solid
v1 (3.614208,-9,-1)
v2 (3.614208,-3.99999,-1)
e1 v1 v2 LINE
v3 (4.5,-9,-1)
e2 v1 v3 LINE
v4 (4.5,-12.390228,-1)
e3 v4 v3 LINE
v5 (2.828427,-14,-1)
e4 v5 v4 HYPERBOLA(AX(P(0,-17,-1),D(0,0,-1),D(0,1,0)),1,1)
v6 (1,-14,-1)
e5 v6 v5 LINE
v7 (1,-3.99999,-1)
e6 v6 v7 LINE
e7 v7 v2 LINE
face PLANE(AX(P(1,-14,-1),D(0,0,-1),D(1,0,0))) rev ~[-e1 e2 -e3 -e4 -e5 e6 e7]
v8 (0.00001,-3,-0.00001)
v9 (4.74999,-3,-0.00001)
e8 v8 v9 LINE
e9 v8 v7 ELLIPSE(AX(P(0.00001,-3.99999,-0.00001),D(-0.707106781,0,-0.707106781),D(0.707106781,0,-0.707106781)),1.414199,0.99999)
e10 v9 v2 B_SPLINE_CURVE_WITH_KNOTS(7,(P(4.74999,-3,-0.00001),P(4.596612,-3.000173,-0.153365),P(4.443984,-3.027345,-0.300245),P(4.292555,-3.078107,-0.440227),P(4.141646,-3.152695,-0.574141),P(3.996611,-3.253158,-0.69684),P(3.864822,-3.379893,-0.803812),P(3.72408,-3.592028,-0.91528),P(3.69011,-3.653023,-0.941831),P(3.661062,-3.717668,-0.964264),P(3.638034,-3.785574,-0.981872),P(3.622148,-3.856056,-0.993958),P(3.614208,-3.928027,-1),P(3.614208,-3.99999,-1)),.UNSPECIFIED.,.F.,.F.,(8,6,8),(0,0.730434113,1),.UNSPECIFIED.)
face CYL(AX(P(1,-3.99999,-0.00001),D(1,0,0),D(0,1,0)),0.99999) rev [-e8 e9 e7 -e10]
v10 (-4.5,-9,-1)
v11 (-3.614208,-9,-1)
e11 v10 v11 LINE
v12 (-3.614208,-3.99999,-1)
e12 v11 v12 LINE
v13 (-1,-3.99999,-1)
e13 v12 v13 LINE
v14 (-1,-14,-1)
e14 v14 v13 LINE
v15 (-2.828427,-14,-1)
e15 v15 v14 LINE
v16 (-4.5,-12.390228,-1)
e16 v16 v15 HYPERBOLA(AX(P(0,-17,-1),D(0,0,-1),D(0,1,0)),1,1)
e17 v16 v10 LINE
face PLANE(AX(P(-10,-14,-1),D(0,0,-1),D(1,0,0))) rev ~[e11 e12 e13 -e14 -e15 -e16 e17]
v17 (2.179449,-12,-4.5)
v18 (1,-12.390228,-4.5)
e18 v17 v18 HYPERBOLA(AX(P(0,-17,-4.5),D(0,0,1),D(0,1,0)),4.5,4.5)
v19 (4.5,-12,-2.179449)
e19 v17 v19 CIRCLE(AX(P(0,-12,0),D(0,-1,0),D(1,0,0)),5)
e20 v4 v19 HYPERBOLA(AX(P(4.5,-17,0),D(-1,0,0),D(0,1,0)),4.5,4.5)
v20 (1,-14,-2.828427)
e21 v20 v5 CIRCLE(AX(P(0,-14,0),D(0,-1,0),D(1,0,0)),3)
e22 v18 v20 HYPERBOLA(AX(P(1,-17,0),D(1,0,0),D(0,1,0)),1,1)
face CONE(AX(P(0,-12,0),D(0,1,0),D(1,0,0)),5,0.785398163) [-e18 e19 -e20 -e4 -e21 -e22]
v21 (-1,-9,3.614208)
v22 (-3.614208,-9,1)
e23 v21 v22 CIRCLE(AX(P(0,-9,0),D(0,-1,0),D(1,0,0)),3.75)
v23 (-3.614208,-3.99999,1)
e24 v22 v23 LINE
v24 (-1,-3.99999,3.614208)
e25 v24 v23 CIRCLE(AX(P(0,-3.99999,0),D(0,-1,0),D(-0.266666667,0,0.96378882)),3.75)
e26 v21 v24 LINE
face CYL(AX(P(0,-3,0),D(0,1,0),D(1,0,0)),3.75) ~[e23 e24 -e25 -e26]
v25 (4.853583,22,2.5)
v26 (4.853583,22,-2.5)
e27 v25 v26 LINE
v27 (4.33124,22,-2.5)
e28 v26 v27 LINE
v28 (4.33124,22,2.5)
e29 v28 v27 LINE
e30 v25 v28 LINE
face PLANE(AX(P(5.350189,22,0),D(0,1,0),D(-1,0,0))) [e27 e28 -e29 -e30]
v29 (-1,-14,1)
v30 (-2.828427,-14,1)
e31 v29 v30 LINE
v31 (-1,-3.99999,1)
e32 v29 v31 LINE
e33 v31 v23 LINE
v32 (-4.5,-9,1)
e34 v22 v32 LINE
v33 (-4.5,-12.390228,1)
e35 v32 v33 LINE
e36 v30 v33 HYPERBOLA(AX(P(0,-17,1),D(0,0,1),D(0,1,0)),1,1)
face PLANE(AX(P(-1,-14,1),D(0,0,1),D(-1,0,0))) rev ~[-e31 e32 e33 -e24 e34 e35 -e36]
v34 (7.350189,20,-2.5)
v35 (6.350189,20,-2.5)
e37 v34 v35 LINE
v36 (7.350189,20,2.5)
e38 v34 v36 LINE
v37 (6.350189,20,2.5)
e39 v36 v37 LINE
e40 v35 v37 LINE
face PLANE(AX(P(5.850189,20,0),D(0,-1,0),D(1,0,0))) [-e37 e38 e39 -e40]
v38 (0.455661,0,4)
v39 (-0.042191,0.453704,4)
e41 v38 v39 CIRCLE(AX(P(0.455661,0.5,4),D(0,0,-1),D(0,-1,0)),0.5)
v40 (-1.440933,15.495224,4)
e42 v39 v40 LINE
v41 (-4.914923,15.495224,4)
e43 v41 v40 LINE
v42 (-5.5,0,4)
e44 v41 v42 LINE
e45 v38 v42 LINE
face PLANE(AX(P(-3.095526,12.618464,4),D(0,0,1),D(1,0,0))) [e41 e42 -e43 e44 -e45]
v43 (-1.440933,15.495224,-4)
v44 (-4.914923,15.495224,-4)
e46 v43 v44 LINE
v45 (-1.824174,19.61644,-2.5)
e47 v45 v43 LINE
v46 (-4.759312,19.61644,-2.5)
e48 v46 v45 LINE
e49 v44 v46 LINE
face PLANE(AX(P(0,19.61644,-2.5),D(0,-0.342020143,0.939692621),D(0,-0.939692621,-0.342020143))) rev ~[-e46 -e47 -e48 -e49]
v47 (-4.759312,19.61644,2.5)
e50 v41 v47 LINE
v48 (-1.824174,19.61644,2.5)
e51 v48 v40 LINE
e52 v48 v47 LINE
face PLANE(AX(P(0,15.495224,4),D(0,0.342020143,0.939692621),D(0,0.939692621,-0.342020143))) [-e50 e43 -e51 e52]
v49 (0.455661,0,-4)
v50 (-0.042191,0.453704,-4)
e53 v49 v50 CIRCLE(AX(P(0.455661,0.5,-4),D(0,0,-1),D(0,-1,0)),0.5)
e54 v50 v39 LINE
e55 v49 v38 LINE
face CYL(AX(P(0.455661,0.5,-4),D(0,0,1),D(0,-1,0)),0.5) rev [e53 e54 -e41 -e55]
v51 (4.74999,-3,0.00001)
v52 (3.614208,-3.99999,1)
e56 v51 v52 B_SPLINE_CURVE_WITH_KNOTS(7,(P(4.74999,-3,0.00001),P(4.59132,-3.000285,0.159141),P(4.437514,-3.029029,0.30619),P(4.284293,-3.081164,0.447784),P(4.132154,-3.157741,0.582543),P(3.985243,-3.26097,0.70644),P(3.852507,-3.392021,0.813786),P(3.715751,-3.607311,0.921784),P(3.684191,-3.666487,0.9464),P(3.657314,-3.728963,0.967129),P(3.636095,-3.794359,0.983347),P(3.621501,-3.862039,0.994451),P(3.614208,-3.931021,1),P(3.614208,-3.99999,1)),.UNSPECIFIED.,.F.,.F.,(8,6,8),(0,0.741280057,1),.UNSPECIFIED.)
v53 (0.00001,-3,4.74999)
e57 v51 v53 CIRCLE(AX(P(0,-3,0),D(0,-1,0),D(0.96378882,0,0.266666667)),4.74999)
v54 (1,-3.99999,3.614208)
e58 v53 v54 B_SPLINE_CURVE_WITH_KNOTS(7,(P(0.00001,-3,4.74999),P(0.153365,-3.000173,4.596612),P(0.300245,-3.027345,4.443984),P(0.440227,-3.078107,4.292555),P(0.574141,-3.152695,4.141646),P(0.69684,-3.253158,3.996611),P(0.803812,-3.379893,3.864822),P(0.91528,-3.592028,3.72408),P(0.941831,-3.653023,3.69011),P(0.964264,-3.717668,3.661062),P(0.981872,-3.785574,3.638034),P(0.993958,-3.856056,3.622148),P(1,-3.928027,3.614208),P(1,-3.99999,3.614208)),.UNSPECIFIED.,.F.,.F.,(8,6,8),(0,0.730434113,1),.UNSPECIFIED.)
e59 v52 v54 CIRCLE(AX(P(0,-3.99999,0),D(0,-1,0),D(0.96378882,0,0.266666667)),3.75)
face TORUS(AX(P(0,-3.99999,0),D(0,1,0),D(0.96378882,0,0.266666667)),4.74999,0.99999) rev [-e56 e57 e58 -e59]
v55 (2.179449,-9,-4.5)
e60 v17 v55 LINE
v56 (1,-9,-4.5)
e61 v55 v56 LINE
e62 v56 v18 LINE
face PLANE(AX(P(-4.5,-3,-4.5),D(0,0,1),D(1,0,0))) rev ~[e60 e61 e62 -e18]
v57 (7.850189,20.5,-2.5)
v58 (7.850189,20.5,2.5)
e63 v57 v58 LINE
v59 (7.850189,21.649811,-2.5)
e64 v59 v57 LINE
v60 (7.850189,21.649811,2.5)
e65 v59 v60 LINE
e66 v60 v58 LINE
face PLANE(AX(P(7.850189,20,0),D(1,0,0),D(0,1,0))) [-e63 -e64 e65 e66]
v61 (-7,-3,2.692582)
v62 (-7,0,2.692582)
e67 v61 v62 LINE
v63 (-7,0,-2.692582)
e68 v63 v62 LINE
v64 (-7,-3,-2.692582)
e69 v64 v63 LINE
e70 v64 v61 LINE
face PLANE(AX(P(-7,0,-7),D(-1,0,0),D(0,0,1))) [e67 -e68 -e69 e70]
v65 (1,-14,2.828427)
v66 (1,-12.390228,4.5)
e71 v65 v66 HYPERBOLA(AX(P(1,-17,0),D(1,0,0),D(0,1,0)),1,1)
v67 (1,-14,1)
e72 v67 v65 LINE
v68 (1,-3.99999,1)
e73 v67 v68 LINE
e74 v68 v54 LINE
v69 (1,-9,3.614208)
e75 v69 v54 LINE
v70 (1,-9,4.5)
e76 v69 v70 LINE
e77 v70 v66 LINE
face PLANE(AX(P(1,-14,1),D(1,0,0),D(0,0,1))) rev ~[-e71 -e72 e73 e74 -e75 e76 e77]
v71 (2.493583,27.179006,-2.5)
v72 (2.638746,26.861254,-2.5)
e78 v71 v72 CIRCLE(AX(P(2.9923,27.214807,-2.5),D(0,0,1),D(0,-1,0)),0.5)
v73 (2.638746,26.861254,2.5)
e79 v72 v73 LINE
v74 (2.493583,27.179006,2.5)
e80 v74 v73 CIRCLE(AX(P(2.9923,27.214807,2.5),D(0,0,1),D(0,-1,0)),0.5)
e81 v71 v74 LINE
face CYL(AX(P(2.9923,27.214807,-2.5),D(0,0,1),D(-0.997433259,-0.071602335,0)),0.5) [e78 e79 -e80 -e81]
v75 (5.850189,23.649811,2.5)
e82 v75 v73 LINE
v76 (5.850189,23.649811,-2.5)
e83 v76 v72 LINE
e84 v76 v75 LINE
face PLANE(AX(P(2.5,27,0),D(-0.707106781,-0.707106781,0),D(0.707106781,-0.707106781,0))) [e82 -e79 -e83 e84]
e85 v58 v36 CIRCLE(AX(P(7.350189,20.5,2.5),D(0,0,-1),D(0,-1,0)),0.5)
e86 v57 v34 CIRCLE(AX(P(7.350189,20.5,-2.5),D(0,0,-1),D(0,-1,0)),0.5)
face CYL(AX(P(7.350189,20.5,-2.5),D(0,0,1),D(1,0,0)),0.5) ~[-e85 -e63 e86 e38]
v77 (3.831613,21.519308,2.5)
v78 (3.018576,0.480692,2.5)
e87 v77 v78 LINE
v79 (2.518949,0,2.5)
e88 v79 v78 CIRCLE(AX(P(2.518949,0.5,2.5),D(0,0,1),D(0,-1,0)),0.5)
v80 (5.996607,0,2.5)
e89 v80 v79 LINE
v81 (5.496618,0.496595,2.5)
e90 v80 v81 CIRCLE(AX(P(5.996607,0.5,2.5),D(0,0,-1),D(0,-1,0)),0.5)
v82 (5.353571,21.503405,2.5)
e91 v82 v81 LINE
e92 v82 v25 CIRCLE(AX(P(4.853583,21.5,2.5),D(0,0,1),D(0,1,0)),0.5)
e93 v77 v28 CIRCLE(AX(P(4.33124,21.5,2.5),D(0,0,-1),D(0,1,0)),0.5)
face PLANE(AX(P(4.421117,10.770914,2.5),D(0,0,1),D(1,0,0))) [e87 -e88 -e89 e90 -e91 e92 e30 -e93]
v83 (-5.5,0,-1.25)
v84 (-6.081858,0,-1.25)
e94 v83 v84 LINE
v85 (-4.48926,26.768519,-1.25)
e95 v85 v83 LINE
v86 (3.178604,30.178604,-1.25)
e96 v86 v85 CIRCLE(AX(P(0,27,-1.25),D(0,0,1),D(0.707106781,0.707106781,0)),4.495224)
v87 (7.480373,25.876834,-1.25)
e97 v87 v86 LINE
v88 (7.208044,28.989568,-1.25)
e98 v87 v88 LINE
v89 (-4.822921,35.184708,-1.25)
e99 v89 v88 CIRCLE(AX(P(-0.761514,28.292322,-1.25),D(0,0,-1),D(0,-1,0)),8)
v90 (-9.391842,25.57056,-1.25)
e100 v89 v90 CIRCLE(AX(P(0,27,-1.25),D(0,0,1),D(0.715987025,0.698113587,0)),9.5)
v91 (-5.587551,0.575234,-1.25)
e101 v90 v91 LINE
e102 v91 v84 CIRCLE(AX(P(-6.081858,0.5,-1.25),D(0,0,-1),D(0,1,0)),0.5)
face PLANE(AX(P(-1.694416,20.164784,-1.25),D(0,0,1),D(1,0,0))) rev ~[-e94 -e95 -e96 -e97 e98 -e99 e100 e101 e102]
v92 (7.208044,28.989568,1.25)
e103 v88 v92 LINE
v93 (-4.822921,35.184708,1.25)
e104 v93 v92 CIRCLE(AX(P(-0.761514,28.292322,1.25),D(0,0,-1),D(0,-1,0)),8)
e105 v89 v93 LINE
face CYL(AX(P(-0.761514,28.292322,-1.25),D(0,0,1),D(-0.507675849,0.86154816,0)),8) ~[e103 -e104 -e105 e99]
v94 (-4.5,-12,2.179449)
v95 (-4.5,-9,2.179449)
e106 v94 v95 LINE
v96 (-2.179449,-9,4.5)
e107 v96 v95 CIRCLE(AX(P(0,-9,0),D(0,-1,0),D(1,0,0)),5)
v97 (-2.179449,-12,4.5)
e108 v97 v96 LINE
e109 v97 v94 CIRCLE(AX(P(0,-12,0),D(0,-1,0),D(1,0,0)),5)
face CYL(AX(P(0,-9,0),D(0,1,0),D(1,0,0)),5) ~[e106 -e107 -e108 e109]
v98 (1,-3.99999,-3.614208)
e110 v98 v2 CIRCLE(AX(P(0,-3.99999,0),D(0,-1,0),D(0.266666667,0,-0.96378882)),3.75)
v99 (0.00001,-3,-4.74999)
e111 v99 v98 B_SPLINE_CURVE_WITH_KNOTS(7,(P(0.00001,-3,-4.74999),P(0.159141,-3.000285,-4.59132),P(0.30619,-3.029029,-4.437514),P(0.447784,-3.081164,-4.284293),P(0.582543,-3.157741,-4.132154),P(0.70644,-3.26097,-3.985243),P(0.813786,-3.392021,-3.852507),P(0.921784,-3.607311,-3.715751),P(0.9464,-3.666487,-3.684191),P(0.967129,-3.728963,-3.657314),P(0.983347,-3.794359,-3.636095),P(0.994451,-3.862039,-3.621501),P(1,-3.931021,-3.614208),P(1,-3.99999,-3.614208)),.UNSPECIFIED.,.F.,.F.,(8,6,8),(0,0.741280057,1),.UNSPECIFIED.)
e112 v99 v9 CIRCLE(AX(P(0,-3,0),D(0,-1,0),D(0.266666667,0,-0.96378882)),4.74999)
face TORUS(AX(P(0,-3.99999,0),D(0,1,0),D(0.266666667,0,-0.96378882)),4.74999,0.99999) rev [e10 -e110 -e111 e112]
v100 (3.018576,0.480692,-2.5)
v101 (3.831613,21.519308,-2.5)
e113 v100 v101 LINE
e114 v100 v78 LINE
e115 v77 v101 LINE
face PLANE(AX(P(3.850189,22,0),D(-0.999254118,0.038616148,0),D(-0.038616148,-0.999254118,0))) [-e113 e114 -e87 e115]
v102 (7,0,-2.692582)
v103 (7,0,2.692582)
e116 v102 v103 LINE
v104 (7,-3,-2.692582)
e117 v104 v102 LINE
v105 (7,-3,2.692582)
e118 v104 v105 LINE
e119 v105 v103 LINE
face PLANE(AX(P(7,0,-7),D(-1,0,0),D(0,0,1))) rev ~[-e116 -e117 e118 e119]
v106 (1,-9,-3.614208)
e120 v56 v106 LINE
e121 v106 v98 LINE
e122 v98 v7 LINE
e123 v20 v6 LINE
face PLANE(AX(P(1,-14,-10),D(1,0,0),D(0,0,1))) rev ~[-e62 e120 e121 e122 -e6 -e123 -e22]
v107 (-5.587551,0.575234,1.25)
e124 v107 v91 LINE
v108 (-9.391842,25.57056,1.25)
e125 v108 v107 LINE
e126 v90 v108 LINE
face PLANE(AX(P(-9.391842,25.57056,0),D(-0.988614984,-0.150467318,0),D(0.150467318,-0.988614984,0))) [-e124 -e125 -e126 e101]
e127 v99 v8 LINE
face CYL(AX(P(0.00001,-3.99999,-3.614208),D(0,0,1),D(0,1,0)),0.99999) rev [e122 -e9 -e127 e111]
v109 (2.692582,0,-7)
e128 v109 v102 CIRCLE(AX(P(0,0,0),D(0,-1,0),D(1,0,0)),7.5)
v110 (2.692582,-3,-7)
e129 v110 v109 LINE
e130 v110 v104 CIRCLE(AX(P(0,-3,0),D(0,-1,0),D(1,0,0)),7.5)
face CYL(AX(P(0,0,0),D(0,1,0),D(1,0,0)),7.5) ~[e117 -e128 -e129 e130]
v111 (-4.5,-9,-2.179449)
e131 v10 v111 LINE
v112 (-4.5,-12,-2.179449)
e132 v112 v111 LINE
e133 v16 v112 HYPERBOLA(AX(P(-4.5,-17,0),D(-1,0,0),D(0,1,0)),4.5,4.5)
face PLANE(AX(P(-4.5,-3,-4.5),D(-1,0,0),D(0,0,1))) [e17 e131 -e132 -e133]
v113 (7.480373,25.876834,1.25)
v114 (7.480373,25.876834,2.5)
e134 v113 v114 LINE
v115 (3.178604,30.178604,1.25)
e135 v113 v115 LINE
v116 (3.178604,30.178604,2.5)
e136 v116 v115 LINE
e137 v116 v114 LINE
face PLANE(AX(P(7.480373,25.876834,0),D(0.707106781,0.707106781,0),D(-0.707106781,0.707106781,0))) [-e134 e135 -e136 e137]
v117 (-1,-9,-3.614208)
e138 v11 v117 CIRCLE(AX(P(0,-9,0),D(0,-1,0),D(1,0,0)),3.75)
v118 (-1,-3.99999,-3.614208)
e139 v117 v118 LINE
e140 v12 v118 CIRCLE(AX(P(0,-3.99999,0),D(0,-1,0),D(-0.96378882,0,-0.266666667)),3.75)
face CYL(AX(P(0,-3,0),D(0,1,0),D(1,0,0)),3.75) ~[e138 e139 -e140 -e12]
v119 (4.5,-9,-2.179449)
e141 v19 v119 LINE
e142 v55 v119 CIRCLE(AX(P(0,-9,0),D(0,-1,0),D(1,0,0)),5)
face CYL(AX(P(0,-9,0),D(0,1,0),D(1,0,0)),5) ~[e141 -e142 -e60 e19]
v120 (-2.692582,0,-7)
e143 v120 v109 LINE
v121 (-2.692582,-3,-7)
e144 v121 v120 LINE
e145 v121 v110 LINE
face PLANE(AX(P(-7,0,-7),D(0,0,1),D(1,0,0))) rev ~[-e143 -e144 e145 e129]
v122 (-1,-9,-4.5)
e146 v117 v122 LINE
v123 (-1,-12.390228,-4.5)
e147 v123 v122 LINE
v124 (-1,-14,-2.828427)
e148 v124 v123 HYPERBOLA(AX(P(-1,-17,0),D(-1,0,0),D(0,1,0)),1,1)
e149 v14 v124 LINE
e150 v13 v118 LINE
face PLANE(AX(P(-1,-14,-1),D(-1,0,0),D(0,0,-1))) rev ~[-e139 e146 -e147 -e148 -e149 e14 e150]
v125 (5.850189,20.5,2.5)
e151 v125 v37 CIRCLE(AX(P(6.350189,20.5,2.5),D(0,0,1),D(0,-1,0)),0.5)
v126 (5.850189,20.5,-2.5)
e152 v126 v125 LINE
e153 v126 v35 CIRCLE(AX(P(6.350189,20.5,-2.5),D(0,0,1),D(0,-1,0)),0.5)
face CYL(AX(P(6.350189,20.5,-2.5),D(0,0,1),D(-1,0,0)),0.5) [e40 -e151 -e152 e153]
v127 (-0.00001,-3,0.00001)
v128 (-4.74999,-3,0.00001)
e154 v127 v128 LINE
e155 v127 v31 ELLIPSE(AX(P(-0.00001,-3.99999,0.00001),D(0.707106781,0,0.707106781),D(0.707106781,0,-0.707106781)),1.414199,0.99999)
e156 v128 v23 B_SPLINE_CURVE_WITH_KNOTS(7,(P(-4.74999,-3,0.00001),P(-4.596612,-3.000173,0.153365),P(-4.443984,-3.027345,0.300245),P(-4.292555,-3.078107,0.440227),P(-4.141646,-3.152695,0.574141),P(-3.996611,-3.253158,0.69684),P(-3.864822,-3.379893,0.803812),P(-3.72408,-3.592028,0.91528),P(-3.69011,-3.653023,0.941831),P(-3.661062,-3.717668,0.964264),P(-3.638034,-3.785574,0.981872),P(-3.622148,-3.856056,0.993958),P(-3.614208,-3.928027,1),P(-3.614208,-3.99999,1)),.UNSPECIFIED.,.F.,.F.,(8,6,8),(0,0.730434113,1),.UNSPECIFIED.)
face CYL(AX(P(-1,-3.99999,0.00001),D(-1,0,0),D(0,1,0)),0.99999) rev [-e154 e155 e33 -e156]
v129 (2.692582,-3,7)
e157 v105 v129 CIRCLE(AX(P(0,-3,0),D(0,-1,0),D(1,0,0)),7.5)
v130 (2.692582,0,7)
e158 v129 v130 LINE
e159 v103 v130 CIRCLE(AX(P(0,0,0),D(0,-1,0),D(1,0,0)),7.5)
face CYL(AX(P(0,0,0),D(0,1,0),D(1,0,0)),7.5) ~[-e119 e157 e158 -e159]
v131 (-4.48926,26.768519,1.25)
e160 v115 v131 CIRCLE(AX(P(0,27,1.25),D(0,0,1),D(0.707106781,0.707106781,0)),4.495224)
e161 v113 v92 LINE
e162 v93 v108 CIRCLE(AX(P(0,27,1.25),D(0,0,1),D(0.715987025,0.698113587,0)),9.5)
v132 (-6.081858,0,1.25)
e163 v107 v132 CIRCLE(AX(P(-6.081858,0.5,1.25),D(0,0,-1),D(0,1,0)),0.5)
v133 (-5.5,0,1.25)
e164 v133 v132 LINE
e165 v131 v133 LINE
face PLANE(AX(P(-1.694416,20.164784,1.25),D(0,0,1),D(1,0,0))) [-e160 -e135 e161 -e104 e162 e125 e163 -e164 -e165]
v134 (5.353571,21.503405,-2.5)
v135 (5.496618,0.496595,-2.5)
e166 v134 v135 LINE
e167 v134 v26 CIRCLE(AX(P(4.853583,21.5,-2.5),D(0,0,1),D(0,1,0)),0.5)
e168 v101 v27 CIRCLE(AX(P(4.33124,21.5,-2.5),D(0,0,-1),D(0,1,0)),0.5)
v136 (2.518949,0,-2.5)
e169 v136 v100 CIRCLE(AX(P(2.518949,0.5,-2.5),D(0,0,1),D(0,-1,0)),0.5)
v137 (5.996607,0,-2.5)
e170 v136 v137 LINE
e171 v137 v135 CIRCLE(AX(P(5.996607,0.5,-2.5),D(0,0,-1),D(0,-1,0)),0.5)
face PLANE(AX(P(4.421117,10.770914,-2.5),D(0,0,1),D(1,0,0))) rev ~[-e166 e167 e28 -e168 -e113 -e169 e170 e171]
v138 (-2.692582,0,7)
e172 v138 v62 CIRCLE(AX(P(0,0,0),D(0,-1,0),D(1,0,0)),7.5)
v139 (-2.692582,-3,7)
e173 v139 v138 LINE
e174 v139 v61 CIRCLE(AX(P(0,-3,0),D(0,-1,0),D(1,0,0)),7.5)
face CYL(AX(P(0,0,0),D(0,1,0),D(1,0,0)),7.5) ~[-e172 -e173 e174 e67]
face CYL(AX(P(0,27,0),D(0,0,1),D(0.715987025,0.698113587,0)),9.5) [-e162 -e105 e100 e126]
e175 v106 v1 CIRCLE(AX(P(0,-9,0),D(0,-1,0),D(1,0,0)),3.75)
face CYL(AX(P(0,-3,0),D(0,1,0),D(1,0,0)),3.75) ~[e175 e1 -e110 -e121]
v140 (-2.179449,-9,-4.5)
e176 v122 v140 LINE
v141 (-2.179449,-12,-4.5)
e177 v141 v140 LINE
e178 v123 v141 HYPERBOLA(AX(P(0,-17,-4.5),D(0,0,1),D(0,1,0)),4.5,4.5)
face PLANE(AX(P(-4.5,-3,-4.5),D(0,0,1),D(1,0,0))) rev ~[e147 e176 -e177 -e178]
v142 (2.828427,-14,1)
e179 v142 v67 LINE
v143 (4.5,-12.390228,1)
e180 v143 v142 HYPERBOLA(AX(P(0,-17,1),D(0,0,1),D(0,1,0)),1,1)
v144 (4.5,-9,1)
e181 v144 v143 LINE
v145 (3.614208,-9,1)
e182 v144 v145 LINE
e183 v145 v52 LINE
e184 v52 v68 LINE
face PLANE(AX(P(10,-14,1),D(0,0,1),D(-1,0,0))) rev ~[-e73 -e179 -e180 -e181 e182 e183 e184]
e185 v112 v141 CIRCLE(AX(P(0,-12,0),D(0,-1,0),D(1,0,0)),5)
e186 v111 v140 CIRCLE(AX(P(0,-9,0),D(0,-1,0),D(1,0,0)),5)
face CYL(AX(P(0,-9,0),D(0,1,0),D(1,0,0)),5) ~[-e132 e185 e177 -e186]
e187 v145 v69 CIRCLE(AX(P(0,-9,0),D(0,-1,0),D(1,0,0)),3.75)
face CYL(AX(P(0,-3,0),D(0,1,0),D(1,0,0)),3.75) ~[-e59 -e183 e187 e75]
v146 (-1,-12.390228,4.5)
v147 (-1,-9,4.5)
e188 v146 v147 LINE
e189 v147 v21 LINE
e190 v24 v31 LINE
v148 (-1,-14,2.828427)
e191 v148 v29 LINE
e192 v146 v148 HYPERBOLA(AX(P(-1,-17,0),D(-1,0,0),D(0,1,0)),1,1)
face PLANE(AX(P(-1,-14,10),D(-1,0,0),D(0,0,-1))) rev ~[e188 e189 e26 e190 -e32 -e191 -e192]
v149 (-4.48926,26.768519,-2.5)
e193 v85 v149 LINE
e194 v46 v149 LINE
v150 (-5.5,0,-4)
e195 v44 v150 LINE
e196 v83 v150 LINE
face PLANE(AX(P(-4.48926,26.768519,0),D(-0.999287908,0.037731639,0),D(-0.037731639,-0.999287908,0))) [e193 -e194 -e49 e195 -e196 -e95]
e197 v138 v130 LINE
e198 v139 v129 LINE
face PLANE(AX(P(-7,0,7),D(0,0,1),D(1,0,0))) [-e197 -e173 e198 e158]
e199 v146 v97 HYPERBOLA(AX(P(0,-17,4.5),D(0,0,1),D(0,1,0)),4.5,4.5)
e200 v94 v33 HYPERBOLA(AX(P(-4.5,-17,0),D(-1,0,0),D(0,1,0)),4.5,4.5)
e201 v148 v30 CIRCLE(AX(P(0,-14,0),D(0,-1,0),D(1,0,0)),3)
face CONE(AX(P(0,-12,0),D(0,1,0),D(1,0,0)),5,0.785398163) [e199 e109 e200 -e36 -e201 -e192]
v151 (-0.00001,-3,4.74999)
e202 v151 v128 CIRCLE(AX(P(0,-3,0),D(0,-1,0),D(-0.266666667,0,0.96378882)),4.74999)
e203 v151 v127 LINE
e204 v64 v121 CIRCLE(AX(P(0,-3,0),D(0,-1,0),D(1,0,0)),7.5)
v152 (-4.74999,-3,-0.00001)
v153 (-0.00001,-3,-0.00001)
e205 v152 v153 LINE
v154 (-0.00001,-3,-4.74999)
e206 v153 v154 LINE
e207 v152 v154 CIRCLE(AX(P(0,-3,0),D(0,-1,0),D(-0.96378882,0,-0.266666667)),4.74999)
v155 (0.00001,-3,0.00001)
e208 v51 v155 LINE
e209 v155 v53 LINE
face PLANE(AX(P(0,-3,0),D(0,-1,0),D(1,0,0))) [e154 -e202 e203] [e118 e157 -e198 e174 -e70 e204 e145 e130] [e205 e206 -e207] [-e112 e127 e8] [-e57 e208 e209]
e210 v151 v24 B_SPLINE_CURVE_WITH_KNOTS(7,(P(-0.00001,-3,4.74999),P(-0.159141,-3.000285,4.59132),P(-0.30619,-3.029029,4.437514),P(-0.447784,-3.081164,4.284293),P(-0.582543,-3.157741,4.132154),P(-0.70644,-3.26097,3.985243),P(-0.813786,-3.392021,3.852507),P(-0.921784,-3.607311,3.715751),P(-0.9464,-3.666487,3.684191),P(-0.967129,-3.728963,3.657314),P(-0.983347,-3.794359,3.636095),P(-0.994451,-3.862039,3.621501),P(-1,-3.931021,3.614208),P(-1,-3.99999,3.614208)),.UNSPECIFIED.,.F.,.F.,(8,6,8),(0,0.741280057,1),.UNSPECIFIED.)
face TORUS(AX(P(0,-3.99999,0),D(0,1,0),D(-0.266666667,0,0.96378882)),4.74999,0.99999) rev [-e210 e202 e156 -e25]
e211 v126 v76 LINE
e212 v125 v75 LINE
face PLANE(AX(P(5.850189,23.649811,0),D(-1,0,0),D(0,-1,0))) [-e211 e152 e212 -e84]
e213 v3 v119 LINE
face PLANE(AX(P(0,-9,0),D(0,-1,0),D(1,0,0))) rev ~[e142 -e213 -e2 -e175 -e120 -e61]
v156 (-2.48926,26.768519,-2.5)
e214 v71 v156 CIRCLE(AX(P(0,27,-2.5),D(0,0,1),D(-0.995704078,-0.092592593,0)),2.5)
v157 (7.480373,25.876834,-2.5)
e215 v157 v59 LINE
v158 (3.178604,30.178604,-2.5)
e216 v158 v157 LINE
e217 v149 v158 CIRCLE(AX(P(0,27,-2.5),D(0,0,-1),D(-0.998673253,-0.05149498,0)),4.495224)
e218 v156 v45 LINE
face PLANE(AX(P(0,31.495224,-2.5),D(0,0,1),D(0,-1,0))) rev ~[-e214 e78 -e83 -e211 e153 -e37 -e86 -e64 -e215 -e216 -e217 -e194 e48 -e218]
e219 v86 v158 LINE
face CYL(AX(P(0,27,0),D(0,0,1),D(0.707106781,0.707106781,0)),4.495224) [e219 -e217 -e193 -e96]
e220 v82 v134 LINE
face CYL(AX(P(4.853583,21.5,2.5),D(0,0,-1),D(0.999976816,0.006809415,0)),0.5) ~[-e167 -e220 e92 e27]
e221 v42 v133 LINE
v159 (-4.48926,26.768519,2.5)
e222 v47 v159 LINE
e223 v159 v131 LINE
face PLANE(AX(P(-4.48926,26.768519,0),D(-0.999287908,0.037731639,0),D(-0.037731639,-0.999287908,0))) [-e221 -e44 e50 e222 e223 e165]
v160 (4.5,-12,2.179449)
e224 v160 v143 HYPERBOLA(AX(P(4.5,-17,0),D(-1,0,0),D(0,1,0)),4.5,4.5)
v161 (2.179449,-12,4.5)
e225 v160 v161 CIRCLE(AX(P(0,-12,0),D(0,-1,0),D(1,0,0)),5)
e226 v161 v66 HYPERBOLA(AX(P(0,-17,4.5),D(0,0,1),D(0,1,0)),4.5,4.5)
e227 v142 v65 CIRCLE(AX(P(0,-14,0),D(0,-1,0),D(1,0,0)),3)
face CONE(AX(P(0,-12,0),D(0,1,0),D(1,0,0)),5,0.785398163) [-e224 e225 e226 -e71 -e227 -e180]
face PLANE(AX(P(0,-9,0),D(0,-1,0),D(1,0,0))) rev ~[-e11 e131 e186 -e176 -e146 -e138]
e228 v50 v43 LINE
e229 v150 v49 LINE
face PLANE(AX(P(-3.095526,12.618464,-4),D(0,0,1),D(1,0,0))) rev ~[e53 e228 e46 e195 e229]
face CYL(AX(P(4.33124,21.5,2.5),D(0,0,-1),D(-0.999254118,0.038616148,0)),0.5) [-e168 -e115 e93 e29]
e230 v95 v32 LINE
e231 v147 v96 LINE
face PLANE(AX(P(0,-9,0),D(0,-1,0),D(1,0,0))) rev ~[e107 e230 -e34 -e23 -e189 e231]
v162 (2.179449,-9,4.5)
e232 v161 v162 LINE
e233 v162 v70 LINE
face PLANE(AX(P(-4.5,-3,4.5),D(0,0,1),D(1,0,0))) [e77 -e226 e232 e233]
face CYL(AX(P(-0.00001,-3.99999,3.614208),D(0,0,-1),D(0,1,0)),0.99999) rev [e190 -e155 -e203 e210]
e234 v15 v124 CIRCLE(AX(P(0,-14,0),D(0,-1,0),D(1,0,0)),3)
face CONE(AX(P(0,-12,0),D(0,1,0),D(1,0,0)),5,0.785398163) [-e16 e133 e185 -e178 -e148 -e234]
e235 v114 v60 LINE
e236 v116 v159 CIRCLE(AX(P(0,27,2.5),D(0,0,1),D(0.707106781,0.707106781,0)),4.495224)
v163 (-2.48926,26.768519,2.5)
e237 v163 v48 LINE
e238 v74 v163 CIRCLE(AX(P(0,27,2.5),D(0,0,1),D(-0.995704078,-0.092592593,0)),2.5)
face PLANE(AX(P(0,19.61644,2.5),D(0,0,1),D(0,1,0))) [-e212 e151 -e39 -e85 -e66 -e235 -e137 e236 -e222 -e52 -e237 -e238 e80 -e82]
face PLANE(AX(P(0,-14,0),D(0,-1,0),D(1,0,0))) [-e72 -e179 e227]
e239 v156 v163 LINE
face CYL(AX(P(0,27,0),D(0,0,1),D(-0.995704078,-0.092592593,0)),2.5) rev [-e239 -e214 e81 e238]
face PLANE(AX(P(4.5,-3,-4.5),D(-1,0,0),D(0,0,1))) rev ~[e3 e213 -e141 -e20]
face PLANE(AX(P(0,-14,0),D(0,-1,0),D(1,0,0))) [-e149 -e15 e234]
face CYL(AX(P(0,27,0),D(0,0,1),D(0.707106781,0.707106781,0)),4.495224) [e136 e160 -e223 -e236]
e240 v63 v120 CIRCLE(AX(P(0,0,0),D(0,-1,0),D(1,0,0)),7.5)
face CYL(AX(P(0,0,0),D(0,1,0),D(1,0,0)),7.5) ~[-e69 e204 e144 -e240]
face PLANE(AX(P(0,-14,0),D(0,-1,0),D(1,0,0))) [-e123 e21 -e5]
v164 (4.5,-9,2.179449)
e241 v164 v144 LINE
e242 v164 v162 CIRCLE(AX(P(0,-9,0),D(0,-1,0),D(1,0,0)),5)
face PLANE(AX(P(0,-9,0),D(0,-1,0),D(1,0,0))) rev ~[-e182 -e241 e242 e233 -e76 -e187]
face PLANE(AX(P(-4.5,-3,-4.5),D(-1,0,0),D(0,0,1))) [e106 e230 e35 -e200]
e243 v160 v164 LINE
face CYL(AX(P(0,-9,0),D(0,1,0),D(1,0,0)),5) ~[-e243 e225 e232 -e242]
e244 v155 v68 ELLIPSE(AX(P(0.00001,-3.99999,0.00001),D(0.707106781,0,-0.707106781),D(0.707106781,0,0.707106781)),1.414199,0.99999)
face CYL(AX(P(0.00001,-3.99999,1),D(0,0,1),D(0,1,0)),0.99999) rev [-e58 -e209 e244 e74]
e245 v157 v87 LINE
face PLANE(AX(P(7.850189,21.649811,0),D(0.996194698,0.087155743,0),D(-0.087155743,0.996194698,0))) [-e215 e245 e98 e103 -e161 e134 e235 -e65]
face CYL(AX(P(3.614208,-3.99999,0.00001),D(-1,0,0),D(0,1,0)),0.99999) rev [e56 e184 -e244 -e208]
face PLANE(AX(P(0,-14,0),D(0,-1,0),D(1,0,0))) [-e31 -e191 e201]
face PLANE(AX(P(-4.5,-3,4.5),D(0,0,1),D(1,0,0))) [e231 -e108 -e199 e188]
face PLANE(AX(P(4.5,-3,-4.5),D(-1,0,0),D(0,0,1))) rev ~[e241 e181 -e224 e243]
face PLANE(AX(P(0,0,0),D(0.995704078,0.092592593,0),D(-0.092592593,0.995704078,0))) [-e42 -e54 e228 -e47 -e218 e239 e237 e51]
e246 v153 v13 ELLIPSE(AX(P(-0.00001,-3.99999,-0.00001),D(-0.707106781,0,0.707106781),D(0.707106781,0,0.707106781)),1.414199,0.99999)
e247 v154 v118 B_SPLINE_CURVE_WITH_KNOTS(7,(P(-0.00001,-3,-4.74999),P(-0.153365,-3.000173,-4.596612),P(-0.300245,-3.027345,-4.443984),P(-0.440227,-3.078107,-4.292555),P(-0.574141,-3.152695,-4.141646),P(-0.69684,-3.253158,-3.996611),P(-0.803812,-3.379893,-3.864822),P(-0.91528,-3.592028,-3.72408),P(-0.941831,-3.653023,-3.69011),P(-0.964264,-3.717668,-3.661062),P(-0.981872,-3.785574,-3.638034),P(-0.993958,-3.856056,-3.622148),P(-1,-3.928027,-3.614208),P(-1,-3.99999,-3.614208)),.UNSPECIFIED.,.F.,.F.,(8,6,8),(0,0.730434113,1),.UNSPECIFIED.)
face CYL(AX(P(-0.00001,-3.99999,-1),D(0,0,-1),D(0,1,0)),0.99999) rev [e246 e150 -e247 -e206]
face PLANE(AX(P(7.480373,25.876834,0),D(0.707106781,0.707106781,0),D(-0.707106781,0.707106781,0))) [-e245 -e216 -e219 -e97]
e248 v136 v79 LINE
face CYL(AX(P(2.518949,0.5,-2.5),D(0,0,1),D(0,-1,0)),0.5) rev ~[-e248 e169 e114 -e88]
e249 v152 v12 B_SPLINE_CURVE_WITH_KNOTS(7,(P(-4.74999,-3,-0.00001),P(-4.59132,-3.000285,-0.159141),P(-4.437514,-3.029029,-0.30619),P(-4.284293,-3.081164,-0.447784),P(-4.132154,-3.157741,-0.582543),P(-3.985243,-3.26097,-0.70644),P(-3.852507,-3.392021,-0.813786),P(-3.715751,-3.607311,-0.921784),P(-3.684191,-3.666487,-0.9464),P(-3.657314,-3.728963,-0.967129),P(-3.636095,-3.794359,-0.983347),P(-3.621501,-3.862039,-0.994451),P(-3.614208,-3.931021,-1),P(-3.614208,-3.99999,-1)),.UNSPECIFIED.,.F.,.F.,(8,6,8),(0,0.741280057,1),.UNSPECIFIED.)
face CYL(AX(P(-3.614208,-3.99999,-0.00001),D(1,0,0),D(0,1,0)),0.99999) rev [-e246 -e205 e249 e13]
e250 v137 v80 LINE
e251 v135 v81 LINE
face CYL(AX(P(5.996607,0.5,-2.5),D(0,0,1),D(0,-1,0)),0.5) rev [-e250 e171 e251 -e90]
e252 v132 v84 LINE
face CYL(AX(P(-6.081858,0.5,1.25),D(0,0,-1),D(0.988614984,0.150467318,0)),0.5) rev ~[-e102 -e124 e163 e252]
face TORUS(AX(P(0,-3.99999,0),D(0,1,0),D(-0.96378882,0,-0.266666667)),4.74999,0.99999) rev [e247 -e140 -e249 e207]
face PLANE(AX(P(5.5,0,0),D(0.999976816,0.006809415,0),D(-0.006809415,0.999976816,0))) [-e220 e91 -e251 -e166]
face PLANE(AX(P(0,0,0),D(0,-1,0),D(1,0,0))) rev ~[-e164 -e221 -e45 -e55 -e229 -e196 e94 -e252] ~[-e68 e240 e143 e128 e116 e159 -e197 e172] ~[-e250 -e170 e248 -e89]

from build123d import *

# Parameters (mm, degrees)
F1_DEPTH  = 1.25
F3_DEPTH  = 4
F4_R      = 7.5
F5_DEPTH  = 3
F7_DEPTH  = 2.5
F9_DEPTH  = 12.5
F10_R     = 3.75
F11_DEPTH = 6
F12_R     = 5
F13_DEPTH = 5
F14_SIZE  = 2
F16_DEPTH = 11
F17_R     = 8
F18_R     = 0.5
F19_W     = 20
F19_H     = 20
F19_W_2   = 9
F19_H_2   = 9
F20_DEPTH = 11.001
F21_R     = 0.99999
F22_W     = 20
F22_H     = 20
F22_W_2   = 14
F22_H_2   = 14
F23_DEPTH = 3


# Not quite as in the source:
# - a fillet or chamfer is up to 0.001 mm smaller than in the source, because OpenCascade refuses the exact size


with BuildPart() as f1:
    # F0 (on Top) → F1 (new body, symmetric)
    with BuildSketch(Plane.XY):
        with BuildLine():
            ThreePointArc((-2.4892601961, 26.7685185185), (-0.1158652446, 29.4973136057), (2.5, 27))
            Line((2.5, 27), (7.8501893912, 21.6498106088))
            Line((7.8501893912, 21.6498106088), (6.8018767371, 33.6320790747))
            ThreePointArc((6.8018767371, 33.6320790747), (-4.2336746433, 35.5044693553), (-9.391842346, 25.5705604779))
            Line((-9.391842346, 25.5705604779), (-5.5, 0))
            Line((-5.5, 0), (0, 0))
            Line((0, 0), (-2.4892601961, 26.7685185185))
        make_face()
    extrude(amount=F1_DEPTH, both=True)

    # F2 (on Top) → F3 (join, symmetric)
    with BuildSketch(Plane.XY):
        Polygon((-5.5, 0), (0, 0), (-2.4892601961, 26.7685185185), (-4.4892601961, 26.7685185185), align=None)
        with BuildLine():
            Line((-4.4892601961, 26.7685185185), (-2.4892601961, 26.7685185185))
            ThreePointArc((-2.4892601961, 26.7685185185), (-0.1158652446, 29.4973136057), (2.5, 27))
            Line((2.5, 27), (5.8501893912, 23.6498106088))
            Line((5.8501893912, 23.6498106088), (7.8501893912, 21.6498106088))
            Line((7.8501893912, 21.6498106088), (7.4803727359, 25.8768343213))
            Line((7.4803727359, 25.8768343213), (3.1786035286, 30.1786035286))
            ThreePointArc((3.1786035286, 30.1786035286), (-1.8266431422, 31.1073611498), (-4.4892601961, 26.7685185185))
        make_face()
        Polygon((7.8501893912, 21.6498106088), (5.8501893912, 23.6498106088), (5.8501893912, 20), (7.8501893912, 20), align=None)
    extrude(amount=F3_DEPTH, both=True)

    # F4 (on Front) → F5 (join)
    with BuildSketch(Plane.XZ):
        Circle(F4_R)
    extrude(amount=F5_DEPTH)

    # F6 (on Top) → F7 (join, symmetric)
    with BuildSketch(Plane.XY):
        Polygon((3.8501893912, 22), (3, 0), (5.5, 0), (5.3501893912, 22), align=None)
    extrude(amount=F7_DEPTH, both=True)

    # F8 (on Right) → F9 (cut, symmetric)
    with BuildSketch(Plane.YZ):
        Polygon((31.4952242196, 2.5), (31.4952242196, 4), (26.7685185185, 4), (15.4952242196, 4), (19.6164403488, 2.5), align=None)
        Polygon((26.7685185185, -4), (31.4952242196, -4), (31.4952242196, -2.5), (19.6164403488, -2.5), (15.4952242196, -4), align=None)
    extrude(amount=F9_DEPTH, both=True, mode=Mode.SUBTRACT)

    # F10 (on face) → F11 (join)
    with BuildSketch(Plane.XZ.offset(3)):
        Circle(F10_R)
    extrude(amount=F11_DEPTH)

    # F12 (on face) → F13 (join)
    with BuildSketch(Plane.XZ.offset(9)):
        Circle(F12_R)
    extrude(amount=F13_DEPTH)

    # F14
    f14_edges = [f1.edges().sort_by_distance(p)[0] for p in [
        (-5, -14, 0),
    ]]
    chamfer(f14_edges, length=F14_SIZE)

    # F15 (on face) → F16 (cut, through all)
    with BuildSketch(Plane.XZ.offset(14)):
        Polygon((1, 1), (1, 10), (-1, 10), (-1, 1), (-10, 1), (-10, -1), (-1, -1), (-1, -10), (1, -10), (1, -1), (10, -1), (10, 1), align=None)
    extrude(amount=-F16_DEPTH, mode=Mode.SUBTRACT)

    # F17
    f17_edges = [f1.edges().sort_by_distance(p)[0] for p in [
        (6.801877, 33.632079, 0),
    ]]
    fillet(f17_edges, radius=F17_R)

    # F18
    f18_edges = [f1.edges().sort_by_distance(p)[0] for p in [
        (5.850189, 20, 0),
        (7.850189, 20, 0),
        (5.350189, 22, 0),
        (3.850189, 22, 0),
        (2.5, 27, 0),
        (0, 0, 0),
        (5.5, 0, 0),
        (3, 0, 0),
        (-5.5, 0, 0),
    ]]
    fillet(f18_edges, radius=F18_R)

    # F19 (on face) → F20 (cut, through all)
    with BuildSketch(Plane.XZ.offset(3)):
        Rectangle(F19_W, F19_H)
        Rectangle(F19_W_2, F19_H_2, mode=Mode.SUBTRACT)
    extrude(amount=F20_DEPTH, mode=Mode.SUBTRACT)

    # F21 (radius 1 in the source; OpenCascade refuses exactly that, so slightly less here)
    f21_edges = [f1.edges().sort_by_distance(p)[0] for p in [
        (-2.65165, -3, -2.65165),
        (2.65165, -3, -2.65165),
        (2.65165, -3, 2.65165),
        (-2.65165, -3, 2.65165),
        (-1, -3, 2.307104),
        (1, -3, 2.307104),
        (2.307104, -3, 1),
        (-2.307104, -3, 1),
        (-2.307104, -3, -1),
        (2.307104, -3, -1),
        (-1, -3, -2.307104),
        (1, -3, -2.307104),
    ]]
    fillet(f21_edges, radius=F21_R)

    # F22 (on Front) → F23 (cut, through all)
    with BuildSketch(Plane.XZ):
        Rectangle(F22_W, F22_H)
        Rectangle(F22_W_2, F22_H_2, mode=Mode.SUBTRACT)
    extrude(amount=F23_DEPTH, mode=Mode.SUBTRACT)


solid = f1.part
